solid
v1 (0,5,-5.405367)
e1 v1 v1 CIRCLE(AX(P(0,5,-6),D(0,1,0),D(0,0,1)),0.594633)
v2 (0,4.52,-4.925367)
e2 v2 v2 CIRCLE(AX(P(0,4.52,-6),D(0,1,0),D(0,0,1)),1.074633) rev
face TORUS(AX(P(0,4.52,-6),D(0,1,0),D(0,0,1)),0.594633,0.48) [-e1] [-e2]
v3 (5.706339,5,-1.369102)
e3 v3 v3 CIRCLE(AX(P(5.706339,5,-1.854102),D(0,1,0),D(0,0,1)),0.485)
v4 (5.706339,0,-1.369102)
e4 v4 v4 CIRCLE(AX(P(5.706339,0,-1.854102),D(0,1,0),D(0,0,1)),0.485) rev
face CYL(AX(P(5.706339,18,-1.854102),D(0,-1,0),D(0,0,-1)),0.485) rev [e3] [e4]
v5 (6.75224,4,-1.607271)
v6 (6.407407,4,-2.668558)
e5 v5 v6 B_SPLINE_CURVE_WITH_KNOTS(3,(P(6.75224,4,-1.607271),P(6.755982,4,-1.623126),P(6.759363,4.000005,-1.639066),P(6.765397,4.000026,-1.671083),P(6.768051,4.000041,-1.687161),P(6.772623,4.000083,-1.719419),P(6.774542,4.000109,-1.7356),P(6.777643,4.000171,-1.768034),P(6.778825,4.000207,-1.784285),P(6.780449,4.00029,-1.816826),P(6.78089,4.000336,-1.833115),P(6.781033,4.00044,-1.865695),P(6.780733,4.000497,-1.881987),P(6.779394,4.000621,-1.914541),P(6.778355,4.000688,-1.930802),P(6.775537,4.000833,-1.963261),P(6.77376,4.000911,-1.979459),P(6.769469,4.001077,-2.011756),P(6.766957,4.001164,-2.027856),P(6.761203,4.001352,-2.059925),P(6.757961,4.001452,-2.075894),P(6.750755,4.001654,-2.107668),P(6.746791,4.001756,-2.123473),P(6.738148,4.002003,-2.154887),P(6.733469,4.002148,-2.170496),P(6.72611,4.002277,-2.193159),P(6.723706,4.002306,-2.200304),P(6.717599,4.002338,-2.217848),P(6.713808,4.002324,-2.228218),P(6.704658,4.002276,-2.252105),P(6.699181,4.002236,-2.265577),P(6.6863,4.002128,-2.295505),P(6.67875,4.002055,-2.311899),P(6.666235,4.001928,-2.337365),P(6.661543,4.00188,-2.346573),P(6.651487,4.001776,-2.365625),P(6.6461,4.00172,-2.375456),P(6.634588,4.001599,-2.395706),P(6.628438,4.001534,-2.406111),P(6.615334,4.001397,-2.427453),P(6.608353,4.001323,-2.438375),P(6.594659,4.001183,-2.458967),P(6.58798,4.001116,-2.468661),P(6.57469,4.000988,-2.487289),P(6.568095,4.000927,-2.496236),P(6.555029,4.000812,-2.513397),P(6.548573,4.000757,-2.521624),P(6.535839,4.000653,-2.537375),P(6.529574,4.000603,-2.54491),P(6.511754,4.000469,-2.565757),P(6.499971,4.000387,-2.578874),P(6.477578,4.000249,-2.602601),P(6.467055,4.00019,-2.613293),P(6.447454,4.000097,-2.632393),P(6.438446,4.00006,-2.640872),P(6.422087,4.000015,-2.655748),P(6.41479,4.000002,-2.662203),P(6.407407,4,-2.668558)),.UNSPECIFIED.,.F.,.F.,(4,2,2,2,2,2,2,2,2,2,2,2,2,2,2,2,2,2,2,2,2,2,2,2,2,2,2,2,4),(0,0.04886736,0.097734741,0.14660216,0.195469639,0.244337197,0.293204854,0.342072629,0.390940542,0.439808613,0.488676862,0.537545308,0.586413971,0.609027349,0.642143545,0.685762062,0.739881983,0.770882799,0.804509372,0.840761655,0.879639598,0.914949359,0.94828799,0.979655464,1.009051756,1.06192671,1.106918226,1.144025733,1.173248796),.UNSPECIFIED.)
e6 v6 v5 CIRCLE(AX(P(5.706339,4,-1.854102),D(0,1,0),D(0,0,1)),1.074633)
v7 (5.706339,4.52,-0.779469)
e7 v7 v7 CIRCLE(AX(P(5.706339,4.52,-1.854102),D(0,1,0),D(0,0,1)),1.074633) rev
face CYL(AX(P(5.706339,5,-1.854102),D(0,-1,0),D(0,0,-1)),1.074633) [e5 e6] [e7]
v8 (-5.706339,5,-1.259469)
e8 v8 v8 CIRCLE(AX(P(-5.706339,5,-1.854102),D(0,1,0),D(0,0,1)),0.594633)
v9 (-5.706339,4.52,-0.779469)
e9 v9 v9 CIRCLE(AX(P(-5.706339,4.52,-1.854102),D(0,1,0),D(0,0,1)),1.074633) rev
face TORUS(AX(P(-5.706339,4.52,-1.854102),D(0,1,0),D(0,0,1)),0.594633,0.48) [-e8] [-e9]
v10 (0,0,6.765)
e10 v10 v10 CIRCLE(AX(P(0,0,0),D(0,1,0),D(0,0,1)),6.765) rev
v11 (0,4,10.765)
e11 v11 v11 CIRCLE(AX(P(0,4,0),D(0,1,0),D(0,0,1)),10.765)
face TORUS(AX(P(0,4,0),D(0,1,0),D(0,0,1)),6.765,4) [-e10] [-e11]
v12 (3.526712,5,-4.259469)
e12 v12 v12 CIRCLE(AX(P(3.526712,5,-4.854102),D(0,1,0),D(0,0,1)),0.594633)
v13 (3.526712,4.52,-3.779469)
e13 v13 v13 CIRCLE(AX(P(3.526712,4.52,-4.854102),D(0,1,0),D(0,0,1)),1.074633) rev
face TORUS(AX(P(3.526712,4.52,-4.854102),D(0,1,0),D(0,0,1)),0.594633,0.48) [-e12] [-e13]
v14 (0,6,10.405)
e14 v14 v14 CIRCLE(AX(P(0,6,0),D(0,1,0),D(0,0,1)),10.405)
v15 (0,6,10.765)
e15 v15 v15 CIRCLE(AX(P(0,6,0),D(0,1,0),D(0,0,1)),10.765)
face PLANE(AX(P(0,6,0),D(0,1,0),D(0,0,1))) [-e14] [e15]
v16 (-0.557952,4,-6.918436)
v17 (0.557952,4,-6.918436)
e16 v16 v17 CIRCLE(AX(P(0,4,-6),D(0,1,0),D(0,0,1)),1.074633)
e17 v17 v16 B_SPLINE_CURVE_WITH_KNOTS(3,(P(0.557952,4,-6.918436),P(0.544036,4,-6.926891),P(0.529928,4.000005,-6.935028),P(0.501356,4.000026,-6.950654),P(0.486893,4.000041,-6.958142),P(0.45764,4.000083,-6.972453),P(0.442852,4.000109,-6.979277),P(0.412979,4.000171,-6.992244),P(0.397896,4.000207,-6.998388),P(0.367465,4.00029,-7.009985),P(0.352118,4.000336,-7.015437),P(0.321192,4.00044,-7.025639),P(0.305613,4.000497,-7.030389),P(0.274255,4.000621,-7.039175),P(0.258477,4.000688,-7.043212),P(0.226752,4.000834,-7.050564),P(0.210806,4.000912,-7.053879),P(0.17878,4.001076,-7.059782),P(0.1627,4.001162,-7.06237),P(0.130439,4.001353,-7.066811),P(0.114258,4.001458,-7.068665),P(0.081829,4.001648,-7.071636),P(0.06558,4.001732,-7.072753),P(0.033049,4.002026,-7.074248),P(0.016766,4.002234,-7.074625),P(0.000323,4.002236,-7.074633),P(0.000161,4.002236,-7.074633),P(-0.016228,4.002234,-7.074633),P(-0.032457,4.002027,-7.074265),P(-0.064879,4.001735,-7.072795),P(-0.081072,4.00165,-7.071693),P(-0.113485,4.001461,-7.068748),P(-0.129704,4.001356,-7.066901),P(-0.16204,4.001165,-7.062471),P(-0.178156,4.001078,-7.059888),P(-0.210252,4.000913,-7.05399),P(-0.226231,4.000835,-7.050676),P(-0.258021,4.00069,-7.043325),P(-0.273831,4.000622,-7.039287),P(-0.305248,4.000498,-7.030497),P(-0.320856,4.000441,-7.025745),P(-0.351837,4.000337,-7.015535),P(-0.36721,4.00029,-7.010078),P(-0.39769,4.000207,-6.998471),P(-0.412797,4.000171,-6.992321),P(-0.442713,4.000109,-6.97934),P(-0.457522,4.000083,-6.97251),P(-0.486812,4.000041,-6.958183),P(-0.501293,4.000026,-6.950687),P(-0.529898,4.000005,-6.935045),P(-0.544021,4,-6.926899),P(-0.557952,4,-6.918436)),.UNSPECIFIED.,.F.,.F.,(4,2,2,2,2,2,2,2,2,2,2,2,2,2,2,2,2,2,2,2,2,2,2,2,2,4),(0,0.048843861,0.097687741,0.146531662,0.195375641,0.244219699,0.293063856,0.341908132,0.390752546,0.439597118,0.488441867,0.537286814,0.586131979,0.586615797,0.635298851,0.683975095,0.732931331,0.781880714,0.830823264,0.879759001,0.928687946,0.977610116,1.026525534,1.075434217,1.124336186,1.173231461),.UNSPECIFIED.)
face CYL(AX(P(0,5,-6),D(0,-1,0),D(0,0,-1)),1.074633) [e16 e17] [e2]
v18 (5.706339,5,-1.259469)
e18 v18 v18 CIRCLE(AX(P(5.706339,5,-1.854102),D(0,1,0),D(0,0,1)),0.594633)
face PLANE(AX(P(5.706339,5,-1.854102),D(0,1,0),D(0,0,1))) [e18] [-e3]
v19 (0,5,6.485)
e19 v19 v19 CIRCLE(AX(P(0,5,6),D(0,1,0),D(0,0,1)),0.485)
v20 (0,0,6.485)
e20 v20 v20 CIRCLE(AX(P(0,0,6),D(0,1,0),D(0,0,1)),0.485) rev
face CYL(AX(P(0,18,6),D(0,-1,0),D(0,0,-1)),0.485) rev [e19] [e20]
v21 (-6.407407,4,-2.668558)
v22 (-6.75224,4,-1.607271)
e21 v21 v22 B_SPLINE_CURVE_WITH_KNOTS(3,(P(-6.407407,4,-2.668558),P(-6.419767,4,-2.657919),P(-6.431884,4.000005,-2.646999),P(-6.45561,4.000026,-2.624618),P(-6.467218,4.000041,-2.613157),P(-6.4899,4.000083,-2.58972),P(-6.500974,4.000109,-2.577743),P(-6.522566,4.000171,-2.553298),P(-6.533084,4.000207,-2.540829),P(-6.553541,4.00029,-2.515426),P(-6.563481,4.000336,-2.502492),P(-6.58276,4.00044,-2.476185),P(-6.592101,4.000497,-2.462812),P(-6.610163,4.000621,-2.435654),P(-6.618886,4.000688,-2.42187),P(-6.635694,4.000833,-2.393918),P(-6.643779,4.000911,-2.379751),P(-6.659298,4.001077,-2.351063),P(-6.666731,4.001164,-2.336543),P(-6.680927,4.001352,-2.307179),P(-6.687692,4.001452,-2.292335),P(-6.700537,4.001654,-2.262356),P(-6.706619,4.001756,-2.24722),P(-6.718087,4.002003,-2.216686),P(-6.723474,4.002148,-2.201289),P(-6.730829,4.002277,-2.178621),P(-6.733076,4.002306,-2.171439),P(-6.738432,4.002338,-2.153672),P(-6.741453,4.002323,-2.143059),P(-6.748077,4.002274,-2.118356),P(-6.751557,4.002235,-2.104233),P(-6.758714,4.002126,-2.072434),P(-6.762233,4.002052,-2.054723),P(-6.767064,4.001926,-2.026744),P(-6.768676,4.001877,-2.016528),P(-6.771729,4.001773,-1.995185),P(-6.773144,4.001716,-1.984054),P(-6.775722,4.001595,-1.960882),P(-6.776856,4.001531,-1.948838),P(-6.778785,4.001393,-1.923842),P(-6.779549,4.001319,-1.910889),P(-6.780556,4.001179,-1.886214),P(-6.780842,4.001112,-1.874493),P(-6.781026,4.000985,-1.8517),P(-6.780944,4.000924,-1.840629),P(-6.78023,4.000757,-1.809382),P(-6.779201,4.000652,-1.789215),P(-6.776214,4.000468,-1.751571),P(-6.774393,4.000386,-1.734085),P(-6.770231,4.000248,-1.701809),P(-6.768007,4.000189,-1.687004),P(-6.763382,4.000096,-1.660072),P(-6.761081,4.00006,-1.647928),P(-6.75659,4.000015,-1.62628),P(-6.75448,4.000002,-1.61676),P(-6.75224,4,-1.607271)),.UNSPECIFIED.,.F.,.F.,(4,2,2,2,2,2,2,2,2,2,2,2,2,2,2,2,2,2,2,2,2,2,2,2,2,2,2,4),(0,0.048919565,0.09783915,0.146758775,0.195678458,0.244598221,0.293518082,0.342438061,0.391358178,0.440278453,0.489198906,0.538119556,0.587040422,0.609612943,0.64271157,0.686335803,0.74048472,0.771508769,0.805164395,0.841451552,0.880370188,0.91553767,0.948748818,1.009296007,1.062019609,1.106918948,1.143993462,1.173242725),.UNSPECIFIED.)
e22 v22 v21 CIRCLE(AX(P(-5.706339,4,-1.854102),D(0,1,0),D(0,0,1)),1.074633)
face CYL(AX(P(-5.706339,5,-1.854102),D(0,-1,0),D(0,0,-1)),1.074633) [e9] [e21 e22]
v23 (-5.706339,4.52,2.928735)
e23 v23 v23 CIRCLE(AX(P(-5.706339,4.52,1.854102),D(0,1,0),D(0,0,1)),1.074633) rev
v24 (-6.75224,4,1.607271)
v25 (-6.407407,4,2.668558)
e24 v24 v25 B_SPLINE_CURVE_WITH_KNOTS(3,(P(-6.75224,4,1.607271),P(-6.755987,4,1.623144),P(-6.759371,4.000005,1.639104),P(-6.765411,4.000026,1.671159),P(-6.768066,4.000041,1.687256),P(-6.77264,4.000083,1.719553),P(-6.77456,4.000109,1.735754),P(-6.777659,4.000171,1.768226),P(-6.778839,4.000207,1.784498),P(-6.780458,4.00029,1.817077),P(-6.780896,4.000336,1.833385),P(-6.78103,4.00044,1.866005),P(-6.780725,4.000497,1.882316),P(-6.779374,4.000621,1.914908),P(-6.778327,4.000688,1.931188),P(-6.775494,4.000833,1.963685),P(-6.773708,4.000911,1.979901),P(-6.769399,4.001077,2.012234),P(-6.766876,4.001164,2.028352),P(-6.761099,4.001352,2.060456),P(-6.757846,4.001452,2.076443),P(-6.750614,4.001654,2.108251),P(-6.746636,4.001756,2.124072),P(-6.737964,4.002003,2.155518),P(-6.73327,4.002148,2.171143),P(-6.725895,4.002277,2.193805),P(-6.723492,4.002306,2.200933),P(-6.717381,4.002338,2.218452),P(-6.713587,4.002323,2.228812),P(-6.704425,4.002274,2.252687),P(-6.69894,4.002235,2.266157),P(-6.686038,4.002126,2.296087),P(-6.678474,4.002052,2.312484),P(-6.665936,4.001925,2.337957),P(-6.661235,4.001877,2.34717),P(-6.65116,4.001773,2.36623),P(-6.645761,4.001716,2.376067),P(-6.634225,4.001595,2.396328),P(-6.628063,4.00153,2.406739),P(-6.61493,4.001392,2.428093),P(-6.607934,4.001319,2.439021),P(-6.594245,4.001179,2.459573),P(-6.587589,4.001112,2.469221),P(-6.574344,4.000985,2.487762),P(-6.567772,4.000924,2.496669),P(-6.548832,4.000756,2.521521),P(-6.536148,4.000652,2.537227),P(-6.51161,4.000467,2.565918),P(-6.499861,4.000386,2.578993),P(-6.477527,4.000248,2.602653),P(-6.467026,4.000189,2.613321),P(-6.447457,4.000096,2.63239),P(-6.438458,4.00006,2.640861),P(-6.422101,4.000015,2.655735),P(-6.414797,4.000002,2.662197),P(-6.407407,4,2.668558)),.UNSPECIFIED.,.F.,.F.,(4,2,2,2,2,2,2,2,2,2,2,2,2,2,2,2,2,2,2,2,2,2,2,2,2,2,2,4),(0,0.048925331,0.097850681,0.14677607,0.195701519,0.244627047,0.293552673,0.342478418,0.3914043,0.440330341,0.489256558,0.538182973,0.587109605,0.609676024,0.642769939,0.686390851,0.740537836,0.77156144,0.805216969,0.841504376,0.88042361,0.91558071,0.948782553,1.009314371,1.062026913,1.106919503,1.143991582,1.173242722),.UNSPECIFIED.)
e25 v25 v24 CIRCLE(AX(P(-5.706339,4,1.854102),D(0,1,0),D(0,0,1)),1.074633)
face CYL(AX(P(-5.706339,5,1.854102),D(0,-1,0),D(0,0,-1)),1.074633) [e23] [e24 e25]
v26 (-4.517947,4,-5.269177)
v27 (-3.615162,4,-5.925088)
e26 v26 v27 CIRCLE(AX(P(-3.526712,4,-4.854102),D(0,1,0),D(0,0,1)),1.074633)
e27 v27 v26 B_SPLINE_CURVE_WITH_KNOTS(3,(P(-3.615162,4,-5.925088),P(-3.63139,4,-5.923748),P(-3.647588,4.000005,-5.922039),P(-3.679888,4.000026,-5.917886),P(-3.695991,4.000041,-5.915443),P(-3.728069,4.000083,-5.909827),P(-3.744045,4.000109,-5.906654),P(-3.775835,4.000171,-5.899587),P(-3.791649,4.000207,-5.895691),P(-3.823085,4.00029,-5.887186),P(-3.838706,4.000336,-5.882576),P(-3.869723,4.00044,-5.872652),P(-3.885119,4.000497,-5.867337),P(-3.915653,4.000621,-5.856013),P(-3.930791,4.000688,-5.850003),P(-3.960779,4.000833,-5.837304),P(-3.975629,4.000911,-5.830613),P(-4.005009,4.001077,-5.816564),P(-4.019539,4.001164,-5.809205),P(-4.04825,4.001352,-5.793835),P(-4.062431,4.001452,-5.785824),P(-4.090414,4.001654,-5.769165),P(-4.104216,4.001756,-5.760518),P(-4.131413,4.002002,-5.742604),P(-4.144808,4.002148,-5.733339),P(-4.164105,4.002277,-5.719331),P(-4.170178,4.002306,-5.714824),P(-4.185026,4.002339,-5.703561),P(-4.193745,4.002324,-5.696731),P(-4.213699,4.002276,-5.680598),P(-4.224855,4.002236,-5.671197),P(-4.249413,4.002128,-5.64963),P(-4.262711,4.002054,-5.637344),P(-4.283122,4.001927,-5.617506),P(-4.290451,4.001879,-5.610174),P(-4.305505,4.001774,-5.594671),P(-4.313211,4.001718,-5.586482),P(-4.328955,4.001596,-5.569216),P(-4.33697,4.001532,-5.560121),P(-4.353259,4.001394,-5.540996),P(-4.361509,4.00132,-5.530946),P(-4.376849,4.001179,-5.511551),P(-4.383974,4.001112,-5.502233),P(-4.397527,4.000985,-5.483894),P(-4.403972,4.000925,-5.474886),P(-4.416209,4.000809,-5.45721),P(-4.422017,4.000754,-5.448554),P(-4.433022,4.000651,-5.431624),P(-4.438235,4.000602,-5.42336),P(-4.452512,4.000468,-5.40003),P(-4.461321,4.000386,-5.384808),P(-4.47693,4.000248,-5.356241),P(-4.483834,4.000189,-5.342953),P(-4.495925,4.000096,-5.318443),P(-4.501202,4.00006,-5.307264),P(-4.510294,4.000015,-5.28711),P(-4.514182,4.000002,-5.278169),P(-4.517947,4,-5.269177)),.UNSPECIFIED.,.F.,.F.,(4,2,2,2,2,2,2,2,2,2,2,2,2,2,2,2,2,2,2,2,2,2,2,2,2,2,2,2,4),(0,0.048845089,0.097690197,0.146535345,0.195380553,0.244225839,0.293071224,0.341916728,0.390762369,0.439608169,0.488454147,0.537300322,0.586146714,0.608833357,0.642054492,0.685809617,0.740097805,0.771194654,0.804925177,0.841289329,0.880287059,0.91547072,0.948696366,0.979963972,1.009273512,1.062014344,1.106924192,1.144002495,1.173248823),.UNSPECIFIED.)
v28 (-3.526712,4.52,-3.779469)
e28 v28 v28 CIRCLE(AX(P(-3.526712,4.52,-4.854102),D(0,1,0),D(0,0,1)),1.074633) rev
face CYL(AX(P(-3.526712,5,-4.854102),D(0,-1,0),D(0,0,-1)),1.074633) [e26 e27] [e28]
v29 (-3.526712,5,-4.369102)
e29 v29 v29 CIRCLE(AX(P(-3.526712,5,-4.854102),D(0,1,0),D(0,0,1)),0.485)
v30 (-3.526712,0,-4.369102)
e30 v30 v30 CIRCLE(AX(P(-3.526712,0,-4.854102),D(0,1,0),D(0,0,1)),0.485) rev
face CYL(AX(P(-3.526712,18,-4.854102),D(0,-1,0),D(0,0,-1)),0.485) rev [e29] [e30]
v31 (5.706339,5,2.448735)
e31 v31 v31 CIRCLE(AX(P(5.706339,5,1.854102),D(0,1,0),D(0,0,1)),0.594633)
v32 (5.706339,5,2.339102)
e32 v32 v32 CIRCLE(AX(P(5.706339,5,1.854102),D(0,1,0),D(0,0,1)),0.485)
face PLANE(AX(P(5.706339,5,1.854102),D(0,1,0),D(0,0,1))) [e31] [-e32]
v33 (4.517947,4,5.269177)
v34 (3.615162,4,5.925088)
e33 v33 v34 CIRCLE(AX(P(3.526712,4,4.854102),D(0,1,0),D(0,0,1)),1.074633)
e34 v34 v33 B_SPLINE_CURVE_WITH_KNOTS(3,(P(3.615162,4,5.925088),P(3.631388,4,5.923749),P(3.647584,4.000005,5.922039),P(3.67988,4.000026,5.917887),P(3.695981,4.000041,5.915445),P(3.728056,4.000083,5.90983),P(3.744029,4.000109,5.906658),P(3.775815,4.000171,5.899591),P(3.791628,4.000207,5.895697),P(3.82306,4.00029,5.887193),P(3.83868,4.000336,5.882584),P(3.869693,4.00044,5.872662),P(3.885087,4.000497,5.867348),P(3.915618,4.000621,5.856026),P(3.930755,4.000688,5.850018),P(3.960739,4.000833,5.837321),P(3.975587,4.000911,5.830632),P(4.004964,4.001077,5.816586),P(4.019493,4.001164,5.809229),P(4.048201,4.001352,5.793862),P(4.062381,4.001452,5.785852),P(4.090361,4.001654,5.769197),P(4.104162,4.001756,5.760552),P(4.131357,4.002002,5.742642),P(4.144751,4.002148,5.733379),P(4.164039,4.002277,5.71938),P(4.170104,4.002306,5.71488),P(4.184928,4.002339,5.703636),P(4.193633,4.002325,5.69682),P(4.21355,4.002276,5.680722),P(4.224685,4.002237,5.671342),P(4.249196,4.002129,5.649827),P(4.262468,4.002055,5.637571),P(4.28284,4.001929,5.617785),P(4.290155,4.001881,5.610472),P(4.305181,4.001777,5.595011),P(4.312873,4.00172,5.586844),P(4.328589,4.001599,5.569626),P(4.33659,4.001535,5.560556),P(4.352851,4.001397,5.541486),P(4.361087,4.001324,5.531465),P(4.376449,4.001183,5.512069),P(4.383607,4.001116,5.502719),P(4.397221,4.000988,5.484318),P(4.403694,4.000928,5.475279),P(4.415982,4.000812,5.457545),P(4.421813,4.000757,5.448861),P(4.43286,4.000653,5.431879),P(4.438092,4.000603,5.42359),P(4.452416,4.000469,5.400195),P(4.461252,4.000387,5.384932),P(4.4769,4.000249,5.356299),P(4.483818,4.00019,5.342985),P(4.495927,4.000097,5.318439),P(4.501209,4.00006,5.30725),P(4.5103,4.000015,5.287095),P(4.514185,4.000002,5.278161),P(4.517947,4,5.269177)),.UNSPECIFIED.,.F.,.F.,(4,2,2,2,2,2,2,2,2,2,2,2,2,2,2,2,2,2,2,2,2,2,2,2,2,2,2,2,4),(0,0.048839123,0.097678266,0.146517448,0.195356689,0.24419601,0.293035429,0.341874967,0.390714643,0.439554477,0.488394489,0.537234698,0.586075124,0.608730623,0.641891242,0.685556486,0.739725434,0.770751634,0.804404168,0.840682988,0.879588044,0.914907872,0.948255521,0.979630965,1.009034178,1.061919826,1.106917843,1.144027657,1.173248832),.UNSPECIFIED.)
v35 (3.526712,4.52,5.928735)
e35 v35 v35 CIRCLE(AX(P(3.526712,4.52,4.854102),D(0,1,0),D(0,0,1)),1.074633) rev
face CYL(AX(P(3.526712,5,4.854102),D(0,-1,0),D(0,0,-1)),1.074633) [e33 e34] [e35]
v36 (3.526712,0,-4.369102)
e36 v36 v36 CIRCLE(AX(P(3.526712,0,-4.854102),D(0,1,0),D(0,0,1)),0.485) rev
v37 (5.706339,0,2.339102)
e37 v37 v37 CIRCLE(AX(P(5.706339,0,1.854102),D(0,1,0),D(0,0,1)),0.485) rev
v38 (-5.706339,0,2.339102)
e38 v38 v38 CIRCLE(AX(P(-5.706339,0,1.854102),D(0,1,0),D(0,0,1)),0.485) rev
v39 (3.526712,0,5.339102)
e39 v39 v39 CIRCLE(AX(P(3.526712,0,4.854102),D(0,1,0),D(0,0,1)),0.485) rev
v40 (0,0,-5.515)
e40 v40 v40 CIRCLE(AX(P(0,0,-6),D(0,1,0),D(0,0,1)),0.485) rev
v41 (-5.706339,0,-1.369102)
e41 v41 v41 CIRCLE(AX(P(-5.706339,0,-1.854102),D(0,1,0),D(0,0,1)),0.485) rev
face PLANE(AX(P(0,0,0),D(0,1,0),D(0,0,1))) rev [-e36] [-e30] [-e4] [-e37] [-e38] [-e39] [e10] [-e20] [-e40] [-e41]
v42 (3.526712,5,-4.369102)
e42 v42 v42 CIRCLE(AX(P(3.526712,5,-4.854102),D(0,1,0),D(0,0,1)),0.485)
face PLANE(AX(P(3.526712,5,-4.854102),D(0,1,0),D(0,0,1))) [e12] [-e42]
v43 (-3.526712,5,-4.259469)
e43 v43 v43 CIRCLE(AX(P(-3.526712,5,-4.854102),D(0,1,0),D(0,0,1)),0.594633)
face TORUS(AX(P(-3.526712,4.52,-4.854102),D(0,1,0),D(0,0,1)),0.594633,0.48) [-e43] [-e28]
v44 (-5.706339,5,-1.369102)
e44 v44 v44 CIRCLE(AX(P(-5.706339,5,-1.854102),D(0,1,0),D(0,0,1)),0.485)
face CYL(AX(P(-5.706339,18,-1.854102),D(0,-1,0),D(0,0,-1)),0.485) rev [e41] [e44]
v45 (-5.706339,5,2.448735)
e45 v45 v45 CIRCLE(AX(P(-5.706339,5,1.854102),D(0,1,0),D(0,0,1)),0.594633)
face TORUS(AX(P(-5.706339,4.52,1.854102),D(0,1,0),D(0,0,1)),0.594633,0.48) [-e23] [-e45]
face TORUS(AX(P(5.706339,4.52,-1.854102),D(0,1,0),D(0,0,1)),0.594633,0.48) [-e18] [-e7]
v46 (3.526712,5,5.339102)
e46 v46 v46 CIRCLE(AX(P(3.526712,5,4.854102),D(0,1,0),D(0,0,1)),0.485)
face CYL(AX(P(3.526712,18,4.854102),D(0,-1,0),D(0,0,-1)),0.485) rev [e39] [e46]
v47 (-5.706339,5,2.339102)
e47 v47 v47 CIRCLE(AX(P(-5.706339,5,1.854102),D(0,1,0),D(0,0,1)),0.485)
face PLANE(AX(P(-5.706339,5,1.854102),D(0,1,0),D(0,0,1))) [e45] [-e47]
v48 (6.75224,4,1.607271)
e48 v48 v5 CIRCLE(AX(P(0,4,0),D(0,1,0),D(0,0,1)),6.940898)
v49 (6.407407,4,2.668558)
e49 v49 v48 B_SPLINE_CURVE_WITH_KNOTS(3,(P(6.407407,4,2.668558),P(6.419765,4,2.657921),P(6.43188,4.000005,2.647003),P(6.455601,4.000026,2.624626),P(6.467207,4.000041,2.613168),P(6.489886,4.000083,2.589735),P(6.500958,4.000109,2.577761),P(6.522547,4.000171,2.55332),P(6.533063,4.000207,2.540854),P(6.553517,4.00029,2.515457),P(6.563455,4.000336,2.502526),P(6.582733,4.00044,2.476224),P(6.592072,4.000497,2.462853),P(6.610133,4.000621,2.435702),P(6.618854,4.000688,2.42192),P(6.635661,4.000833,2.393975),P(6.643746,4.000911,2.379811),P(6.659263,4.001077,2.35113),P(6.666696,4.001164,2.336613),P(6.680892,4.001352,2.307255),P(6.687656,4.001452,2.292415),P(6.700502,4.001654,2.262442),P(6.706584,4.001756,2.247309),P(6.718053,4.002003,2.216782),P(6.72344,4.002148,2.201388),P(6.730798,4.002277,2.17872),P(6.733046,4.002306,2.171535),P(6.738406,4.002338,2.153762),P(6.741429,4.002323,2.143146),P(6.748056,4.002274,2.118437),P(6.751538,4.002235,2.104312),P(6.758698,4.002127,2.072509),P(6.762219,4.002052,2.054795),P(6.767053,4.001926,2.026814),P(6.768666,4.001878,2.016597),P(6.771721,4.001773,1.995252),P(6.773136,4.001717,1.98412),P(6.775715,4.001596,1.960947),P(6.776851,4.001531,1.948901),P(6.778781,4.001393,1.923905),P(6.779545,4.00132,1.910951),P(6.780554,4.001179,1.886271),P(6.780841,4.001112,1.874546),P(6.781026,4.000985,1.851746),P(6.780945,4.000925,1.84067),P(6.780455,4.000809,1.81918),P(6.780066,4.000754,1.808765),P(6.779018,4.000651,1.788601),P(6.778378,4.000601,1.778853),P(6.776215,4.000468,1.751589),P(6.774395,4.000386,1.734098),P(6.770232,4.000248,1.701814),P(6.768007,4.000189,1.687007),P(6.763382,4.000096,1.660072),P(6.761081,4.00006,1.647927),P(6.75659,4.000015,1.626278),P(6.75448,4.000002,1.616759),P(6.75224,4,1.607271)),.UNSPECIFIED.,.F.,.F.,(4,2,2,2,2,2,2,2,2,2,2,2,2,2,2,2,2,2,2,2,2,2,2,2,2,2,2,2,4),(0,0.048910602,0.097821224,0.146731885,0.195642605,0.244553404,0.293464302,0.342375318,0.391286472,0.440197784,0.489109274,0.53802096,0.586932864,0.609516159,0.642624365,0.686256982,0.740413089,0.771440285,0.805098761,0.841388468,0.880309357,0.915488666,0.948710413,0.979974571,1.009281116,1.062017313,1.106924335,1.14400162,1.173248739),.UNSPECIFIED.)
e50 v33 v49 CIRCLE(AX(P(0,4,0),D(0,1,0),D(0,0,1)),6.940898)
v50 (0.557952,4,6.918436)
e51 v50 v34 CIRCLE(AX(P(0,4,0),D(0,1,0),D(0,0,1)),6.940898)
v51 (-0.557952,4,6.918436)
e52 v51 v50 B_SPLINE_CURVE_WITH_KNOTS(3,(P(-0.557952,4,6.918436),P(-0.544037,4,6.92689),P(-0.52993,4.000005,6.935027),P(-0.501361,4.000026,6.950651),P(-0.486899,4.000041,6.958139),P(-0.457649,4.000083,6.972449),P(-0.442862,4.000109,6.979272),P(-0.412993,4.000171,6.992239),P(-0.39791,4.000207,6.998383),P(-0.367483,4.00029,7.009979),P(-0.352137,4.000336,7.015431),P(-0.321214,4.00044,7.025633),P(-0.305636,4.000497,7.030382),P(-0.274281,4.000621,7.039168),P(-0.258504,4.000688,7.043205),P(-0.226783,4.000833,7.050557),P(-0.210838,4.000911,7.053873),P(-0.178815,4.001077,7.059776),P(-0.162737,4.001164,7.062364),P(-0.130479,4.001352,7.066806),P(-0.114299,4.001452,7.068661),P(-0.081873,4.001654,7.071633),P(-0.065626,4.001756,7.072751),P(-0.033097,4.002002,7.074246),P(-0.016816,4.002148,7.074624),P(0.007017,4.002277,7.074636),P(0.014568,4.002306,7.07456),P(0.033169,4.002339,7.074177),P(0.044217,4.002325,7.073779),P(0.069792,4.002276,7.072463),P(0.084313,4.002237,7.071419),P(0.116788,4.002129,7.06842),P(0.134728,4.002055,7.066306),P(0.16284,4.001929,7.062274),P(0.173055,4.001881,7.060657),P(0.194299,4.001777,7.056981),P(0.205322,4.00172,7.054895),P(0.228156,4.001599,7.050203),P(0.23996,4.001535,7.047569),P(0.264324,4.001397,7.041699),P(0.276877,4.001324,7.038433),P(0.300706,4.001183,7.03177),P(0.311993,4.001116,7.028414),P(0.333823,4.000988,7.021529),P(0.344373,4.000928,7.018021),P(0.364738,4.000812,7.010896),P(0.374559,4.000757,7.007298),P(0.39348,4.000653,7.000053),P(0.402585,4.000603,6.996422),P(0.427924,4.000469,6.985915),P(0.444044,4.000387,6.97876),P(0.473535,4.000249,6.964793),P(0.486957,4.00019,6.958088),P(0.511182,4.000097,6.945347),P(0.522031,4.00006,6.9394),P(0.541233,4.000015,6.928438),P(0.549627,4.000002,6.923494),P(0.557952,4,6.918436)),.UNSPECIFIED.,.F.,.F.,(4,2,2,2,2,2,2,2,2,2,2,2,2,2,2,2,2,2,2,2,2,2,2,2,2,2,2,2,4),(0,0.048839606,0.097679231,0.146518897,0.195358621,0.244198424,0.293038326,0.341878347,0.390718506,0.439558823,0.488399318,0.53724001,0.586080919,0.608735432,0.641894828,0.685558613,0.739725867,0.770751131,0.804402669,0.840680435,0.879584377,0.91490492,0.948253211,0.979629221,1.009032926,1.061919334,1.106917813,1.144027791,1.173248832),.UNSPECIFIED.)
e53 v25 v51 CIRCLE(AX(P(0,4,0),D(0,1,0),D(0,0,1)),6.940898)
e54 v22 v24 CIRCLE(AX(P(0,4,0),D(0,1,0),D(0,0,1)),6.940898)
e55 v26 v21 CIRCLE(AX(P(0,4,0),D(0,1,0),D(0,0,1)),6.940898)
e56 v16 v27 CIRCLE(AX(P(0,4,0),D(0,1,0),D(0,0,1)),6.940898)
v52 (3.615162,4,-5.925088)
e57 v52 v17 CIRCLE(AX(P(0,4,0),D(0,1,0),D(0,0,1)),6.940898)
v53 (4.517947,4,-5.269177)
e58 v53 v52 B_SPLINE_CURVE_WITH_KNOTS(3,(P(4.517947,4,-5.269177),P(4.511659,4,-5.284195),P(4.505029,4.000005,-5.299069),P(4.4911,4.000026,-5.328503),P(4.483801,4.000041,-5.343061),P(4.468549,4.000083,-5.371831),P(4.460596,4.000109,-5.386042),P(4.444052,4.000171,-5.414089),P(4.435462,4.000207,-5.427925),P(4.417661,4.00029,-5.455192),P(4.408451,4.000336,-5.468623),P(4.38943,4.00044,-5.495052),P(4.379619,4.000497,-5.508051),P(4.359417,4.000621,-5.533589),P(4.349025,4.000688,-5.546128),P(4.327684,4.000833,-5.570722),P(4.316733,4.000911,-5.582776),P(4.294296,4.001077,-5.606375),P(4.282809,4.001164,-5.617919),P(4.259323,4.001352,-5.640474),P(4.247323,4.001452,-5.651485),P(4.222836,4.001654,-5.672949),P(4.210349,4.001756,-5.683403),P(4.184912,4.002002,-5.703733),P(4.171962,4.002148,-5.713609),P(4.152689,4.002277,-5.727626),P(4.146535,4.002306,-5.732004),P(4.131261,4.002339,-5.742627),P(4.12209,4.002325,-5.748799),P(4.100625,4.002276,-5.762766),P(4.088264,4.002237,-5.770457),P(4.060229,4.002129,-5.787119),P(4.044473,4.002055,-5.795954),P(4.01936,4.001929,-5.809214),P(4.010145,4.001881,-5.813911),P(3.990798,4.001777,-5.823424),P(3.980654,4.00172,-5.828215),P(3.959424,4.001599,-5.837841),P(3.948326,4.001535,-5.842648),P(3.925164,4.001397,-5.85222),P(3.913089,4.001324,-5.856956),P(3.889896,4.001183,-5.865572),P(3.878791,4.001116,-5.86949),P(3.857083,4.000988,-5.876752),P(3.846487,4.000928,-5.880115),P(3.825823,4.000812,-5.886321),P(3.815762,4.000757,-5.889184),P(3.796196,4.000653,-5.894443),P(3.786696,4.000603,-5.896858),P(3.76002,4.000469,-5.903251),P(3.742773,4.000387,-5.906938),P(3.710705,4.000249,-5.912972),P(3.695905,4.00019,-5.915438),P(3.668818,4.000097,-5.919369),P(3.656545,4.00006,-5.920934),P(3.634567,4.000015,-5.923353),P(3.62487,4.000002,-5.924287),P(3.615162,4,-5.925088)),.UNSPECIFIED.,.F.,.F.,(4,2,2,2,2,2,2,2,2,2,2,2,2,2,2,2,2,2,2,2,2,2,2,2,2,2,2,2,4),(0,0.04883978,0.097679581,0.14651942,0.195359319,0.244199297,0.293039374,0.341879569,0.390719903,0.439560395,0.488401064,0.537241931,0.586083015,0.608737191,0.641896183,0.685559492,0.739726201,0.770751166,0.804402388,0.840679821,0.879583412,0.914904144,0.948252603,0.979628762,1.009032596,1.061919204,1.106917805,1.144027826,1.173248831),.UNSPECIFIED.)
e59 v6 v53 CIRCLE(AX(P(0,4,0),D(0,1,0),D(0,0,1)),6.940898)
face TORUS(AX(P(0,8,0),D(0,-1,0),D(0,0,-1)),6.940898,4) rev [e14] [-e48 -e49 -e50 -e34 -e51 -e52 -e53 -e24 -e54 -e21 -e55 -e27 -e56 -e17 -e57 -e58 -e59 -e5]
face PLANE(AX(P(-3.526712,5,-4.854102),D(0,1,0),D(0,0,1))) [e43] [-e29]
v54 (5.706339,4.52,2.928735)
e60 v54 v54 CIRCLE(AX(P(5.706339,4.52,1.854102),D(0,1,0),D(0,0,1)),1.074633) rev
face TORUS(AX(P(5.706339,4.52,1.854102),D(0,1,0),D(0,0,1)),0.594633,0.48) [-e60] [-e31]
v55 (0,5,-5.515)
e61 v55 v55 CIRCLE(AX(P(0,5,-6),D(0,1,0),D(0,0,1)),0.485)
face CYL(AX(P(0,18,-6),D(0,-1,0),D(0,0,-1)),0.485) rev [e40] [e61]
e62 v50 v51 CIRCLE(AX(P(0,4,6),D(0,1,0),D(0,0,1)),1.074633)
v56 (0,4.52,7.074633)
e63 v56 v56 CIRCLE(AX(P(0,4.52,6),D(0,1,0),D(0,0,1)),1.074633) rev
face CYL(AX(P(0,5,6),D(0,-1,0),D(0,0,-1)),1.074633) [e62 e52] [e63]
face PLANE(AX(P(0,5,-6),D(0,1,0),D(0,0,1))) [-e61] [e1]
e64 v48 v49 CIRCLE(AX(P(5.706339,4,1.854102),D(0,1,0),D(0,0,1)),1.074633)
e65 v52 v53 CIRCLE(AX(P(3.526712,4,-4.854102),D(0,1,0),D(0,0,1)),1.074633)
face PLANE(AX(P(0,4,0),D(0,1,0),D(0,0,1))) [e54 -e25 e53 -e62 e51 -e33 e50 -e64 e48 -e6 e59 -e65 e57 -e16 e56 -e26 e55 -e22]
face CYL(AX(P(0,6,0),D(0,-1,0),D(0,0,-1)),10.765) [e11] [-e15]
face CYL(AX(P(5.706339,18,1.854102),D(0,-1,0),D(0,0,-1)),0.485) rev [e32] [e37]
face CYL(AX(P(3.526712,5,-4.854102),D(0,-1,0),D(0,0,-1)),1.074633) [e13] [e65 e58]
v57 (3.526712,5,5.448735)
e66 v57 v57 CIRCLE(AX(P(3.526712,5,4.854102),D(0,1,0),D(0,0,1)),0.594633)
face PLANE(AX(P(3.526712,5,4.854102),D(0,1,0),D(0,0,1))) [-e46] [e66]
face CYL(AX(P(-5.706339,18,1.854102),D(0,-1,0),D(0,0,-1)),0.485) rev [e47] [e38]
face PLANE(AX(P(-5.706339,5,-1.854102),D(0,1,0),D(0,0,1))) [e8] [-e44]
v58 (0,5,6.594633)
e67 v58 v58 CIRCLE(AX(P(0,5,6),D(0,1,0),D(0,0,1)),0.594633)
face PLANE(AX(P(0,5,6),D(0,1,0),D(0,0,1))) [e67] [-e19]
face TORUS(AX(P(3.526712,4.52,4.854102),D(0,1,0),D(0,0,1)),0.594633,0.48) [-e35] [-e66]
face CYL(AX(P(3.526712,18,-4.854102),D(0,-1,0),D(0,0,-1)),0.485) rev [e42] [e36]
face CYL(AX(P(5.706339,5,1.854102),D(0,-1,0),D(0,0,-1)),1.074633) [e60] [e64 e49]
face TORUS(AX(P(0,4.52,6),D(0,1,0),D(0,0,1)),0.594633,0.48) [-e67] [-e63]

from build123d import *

# Parameters (mm, degrees)
ESBO_O1_R                  = 10.765
RESSALTO_EXTRUS_O1_DEPTH   = 6
FILETE2_R                  = 4
ESBO_O5_R                  = 10.405
CORTE_EXTRUS_O2_DEPTH      = 2
FILETE3_R                  = 4
CORTE_EXTRUS_O4_DEPTH      = 14
CORTE_EXTRUS_O4_DEPTH_BACK = 10
ESBO_O6_R                  = 0.485
RESSALTO_EXTRUS_O2_START   = 1
ESBO_O7_R                  = 1.074632639
ESBO_O7_R_2                = 0.485
RESSALTO_EXTRUS_O2_DEPTH   = 1
FILETE5_R                  = 0.48


with BuildPart() as part:
    # Esboço1 → Ressalto-extrusão1 (new body)
    with BuildSketch(Plane(origin=(0, 0, 0), x_dir=(1, 0, 0), z_dir=(0, 1, 0))):
        with Locations(Location((0, 0, 0), (0, 0, 270))):
            Circle(ESBO_O1_R)
    extrude(amount=RESSALTO_EXTRUS_O1_DEPTH)

    # Filete2
    filete2_edges = [part.edges().sort_by_distance(p)[0] for p in [
        (0, 0, -10.765),
    ]]
    fillet(filete2_edges, radius=FILETE2_R)

    # Esboço5 → Corte-extrusão2 (cut)
    with BuildSketch(Plane(origin=(0, 6, 0), x_dir=(1, 0, 0), z_dir=(0, 1, 0))):
        with Locations(Location((0, 0, 0), (0, 0, 270))):
            Circle(ESBO_O5_R)
    extrude(amount=-CORTE_EXTRUS_O2_DEPTH, mode=Mode.SUBTRACT)

    # Filete3
    # the kernel refuses this fillet: 4 mm, written as the material it adds along each edge
    with BuildSketch(Plane(origin=(0, 4, 0), x_dir=(0, 0, 1), z_dir=(-1, 0, 0))) as filete3_piece_1:
        with BuildLine():
            CenterArc((6.940898385, 4), FILETE3_R, 270, 60)
            Line((6.940898385, 0), (6.940898385, -0.08))
            Line((6.940898385, -0.08), (10.405, -0.08))
            Line((10.405, -0.08), (10.485, 0))
            ThreePointArc((10.485, 0), (10.485, 1), (10.474282032, 1.96))
            Line((10.474282032, 1.96), (10.405, 2))
        make_face()
    revolve(axis=Axis((0, 4, 0), (0, 1, 0)))

    # Esboço6 → Corte-extrusão4 (cut, two sides: drawn at the far end of the back side and taken through both)
    with BuildSketch(Plane(origin=(0, 4, 0), x_dir=(1, 0, 0), z_dir=(0, 1, 0)).offset(-CORTE_EXTRUS_O4_DEPTH_BACK)):
        with Locations(Location((0, 6, 0), (0, 0, 270))):
            Circle(ESBO_O6_R)
        with Locations(Location((3.526711514, 4.854101966, 0), (0, 0, 270))):
            Circle(ESBO_O6_R)
        with Locations(Location((5.706339098, 1.854101966, 0), (0, 0, 270))):
            Circle(ESBO_O6_R)
        with Locations(Location((5.706339098, -1.854101966, 0), (0, 0, 270))):
            Circle(ESBO_O6_R)
        with Locations(Location((3.526711514, -4.854101966, 0), (0, 0, 270))):
            Circle(ESBO_O6_R)
        with Locations(Location((0, -6, 0), (0, 0, 270))):
            Circle(ESBO_O6_R)
        with Locations(Location((-5.706339098, -1.854101966, 0), (0, 0, 270))):
            Circle(ESBO_O6_R)
        with Locations(Location((-5.706339098, 1.854101966, 0), (0, 0, 270))):
            Circle(ESBO_O6_R)
        with Locations(Location((-3.526711514, 4.854101966, 0), (0, 0, 270))):
            Circle(ESBO_O6_R)
    extrude(amount=CORTE_EXTRUS_O4_DEPTH + CORTE_EXTRUS_O4_DEPTH_BACK, mode=Mode.SUBTRACT)

    # Esboço7 → Ressalto-extrusão2 (add)
    # profile 1 of 9: a face of its own
    with BuildSketch(Plane(origin=(0, 4, 0), x_dir=(1, 0, 0), z_dir=(0, 1, 0)).offset(RESSALTO_EXTRUS_O2_START)):
        with Locations(Location((-3.526711514, 4.854101966, 0), (0, 0, 94.72124094))):
            Circle(ESBO_O7_R)
        with Locations(Location((-3.526711514, 4.854101966, 0), (0, 0, 270))):
            Circle(ESBO_O7_R_2, mode=Mode.SUBTRACT)
    # profile 2 of 9: a face of its own
    with BuildSketch(Plane(origin=(0, 4, 0), x_dir=(1, 0, 0), z_dir=(0, 1, 0)).offset(RESSALTO_EXTRUS_O2_START)):
        with Locations(Location((0, 6, 0), (0, 0, 121.27875906))):
            Circle(ESBO_O7_R)
        with Locations(Location((0, 6, 0), (0, 0, 270.000000001))):
            Circle(ESBO_O7_R_2, mode=Mode.SUBTRACT)
    # profile 3 of 9: a face of its own
    with BuildSketch(Plane(origin=(0, 4, 0), x_dir=(1, 0, 0), z_dir=(0, 1, 0)).offset(RESSALTO_EXTRUS_O2_START)):
        with Locations(Location((3.526711514, 4.854101966, 0), (0, 0, 85.27875906))):
            Circle(ESBO_O7_R)
        with Locations(Location((3.526711514, 4.854101966, 0), (0, 0, 270.000000002))):
            Circle(ESBO_O7_R_2, mode=Mode.SUBTRACT)
    # profile 4 of 9: a face of its own
    with BuildSketch(Plane(origin=(0, 4, 0), x_dir=(1, 0, 0), z_dir=(0, 1, 0)).offset(RESSALTO_EXTRUS_O2_START)):
        with Locations(Location((5.706339098, 1.854101966, 0), (0, 0, 49.27875906))):
            Circle(ESBO_O7_R)
        with Locations(Location((5.706339098, 1.854101966, 0), (0, 0, 270.000000003))):
            Circle(ESBO_O7_R_2, mode=Mode.SUBTRACT)
    # profile 5 of 9: a face of its own
    with BuildSketch(Plane(origin=(0, 4, 0), x_dir=(1, 0, 0), z_dir=(0, 1, 0)).offset(RESSALTO_EXTRUS_O2_START)):
        with Locations(Location((5.706339098, -1.854101966, 0), (0, 0, 13.27875906))):
            Circle(ESBO_O7_R)
        with Locations(Location((5.706339098, -1.854101966, 0), (0, 0, 270.000000004))):
            Circle(ESBO_O7_R_2, mode=Mode.SUBTRACT)
    # profile 6 of 9: a face of its own
    with BuildSketch(Plane(origin=(0, 4, 0), x_dir=(1, 0, 0), z_dir=(0, 1, 0)).offset(RESSALTO_EXTRUS_O2_START)):
        with Locations(Location((3.526711514, -4.854101966, 0), (0, 0, 337.27875906))):
            Circle(ESBO_O7_R)
        with Locations(Location((3.526711514, -4.854101966, 0), (0, 0, 270.000000004))):
            Circle(ESBO_O7_R_2, mode=Mode.SUBTRACT)
    # profile 7 of 9: a face of its own
    with BuildSketch(Plane(origin=(0, 4, 0), x_dir=(1, 0, 0), z_dir=(0, 1, 0)).offset(RESSALTO_EXTRUS_O2_START)):
        with Locations(Location((0, -6, 0), (0, 0, 301.27875906))):
            Circle(ESBO_O7_R)
        with Locations(Location((0, -6, 0), (0, 0, 270.000000003))):
            Circle(ESBO_O7_R_2, mode=Mode.SUBTRACT)
    # profile 8 of 9: a face of its own
    with BuildSketch(Plane(origin=(0, 4, 0), x_dir=(1, 0, 0), z_dir=(0, 1, 0)).offset(RESSALTO_EXTRUS_O2_START)):
        with Locations(Location((-5.706339098, -1.854101966, 0), (0, 0, 166.72124094))):
            Circle(ESBO_O7_R)
        with Locations(Location((-5.706339098, -1.854101966, 0), (0, 0, 270.000000001))):
            Circle(ESBO_O7_R_2, mode=Mode.SUBTRACT)
    # profile 9 of 9: a face of its own
    with BuildSketch(Plane(origin=(0, 4, 0), x_dir=(1, 0, 0), z_dir=(0, 1, 0)).offset(RESSALTO_EXTRUS_O2_START)):
        with Locations(Location((-5.706339098, 1.854101966, 0), (0, 0, 130.72124094))):
            Circle(ESBO_O7_R)
        with Locations(Location((-5.706339098, 1.854101966, 0), (0, 0, 270))):
            Circle(ESBO_O7_R_2, mode=Mode.SUBTRACT)
    extrude(amount=-RESSALTO_EXTRUS_O2_DEPTH)

    # Filete5
    filete5_edges = [part.edges().sort_by_distance(p)[0] for p in [
        (4.66043774, 5, 2.100933198),
        (2.535475783, 5, 4.439027234),
        (-0.557951746, 5, 5.081563743),
        (-4.66043774, 5, 2.100933198),
        (-5.005270882, 5, -1.039645911),
        (-3.438260671, 5, -3.783115619),
        (0.557951746, 5, -5.081563743),
        (3.438260671, 5, -3.783115619),
        (5.005270882, 5, -1.039645911),
    ]]
    fillet(filete5_edges, radius=FILETE5_R)


solid = part.part
